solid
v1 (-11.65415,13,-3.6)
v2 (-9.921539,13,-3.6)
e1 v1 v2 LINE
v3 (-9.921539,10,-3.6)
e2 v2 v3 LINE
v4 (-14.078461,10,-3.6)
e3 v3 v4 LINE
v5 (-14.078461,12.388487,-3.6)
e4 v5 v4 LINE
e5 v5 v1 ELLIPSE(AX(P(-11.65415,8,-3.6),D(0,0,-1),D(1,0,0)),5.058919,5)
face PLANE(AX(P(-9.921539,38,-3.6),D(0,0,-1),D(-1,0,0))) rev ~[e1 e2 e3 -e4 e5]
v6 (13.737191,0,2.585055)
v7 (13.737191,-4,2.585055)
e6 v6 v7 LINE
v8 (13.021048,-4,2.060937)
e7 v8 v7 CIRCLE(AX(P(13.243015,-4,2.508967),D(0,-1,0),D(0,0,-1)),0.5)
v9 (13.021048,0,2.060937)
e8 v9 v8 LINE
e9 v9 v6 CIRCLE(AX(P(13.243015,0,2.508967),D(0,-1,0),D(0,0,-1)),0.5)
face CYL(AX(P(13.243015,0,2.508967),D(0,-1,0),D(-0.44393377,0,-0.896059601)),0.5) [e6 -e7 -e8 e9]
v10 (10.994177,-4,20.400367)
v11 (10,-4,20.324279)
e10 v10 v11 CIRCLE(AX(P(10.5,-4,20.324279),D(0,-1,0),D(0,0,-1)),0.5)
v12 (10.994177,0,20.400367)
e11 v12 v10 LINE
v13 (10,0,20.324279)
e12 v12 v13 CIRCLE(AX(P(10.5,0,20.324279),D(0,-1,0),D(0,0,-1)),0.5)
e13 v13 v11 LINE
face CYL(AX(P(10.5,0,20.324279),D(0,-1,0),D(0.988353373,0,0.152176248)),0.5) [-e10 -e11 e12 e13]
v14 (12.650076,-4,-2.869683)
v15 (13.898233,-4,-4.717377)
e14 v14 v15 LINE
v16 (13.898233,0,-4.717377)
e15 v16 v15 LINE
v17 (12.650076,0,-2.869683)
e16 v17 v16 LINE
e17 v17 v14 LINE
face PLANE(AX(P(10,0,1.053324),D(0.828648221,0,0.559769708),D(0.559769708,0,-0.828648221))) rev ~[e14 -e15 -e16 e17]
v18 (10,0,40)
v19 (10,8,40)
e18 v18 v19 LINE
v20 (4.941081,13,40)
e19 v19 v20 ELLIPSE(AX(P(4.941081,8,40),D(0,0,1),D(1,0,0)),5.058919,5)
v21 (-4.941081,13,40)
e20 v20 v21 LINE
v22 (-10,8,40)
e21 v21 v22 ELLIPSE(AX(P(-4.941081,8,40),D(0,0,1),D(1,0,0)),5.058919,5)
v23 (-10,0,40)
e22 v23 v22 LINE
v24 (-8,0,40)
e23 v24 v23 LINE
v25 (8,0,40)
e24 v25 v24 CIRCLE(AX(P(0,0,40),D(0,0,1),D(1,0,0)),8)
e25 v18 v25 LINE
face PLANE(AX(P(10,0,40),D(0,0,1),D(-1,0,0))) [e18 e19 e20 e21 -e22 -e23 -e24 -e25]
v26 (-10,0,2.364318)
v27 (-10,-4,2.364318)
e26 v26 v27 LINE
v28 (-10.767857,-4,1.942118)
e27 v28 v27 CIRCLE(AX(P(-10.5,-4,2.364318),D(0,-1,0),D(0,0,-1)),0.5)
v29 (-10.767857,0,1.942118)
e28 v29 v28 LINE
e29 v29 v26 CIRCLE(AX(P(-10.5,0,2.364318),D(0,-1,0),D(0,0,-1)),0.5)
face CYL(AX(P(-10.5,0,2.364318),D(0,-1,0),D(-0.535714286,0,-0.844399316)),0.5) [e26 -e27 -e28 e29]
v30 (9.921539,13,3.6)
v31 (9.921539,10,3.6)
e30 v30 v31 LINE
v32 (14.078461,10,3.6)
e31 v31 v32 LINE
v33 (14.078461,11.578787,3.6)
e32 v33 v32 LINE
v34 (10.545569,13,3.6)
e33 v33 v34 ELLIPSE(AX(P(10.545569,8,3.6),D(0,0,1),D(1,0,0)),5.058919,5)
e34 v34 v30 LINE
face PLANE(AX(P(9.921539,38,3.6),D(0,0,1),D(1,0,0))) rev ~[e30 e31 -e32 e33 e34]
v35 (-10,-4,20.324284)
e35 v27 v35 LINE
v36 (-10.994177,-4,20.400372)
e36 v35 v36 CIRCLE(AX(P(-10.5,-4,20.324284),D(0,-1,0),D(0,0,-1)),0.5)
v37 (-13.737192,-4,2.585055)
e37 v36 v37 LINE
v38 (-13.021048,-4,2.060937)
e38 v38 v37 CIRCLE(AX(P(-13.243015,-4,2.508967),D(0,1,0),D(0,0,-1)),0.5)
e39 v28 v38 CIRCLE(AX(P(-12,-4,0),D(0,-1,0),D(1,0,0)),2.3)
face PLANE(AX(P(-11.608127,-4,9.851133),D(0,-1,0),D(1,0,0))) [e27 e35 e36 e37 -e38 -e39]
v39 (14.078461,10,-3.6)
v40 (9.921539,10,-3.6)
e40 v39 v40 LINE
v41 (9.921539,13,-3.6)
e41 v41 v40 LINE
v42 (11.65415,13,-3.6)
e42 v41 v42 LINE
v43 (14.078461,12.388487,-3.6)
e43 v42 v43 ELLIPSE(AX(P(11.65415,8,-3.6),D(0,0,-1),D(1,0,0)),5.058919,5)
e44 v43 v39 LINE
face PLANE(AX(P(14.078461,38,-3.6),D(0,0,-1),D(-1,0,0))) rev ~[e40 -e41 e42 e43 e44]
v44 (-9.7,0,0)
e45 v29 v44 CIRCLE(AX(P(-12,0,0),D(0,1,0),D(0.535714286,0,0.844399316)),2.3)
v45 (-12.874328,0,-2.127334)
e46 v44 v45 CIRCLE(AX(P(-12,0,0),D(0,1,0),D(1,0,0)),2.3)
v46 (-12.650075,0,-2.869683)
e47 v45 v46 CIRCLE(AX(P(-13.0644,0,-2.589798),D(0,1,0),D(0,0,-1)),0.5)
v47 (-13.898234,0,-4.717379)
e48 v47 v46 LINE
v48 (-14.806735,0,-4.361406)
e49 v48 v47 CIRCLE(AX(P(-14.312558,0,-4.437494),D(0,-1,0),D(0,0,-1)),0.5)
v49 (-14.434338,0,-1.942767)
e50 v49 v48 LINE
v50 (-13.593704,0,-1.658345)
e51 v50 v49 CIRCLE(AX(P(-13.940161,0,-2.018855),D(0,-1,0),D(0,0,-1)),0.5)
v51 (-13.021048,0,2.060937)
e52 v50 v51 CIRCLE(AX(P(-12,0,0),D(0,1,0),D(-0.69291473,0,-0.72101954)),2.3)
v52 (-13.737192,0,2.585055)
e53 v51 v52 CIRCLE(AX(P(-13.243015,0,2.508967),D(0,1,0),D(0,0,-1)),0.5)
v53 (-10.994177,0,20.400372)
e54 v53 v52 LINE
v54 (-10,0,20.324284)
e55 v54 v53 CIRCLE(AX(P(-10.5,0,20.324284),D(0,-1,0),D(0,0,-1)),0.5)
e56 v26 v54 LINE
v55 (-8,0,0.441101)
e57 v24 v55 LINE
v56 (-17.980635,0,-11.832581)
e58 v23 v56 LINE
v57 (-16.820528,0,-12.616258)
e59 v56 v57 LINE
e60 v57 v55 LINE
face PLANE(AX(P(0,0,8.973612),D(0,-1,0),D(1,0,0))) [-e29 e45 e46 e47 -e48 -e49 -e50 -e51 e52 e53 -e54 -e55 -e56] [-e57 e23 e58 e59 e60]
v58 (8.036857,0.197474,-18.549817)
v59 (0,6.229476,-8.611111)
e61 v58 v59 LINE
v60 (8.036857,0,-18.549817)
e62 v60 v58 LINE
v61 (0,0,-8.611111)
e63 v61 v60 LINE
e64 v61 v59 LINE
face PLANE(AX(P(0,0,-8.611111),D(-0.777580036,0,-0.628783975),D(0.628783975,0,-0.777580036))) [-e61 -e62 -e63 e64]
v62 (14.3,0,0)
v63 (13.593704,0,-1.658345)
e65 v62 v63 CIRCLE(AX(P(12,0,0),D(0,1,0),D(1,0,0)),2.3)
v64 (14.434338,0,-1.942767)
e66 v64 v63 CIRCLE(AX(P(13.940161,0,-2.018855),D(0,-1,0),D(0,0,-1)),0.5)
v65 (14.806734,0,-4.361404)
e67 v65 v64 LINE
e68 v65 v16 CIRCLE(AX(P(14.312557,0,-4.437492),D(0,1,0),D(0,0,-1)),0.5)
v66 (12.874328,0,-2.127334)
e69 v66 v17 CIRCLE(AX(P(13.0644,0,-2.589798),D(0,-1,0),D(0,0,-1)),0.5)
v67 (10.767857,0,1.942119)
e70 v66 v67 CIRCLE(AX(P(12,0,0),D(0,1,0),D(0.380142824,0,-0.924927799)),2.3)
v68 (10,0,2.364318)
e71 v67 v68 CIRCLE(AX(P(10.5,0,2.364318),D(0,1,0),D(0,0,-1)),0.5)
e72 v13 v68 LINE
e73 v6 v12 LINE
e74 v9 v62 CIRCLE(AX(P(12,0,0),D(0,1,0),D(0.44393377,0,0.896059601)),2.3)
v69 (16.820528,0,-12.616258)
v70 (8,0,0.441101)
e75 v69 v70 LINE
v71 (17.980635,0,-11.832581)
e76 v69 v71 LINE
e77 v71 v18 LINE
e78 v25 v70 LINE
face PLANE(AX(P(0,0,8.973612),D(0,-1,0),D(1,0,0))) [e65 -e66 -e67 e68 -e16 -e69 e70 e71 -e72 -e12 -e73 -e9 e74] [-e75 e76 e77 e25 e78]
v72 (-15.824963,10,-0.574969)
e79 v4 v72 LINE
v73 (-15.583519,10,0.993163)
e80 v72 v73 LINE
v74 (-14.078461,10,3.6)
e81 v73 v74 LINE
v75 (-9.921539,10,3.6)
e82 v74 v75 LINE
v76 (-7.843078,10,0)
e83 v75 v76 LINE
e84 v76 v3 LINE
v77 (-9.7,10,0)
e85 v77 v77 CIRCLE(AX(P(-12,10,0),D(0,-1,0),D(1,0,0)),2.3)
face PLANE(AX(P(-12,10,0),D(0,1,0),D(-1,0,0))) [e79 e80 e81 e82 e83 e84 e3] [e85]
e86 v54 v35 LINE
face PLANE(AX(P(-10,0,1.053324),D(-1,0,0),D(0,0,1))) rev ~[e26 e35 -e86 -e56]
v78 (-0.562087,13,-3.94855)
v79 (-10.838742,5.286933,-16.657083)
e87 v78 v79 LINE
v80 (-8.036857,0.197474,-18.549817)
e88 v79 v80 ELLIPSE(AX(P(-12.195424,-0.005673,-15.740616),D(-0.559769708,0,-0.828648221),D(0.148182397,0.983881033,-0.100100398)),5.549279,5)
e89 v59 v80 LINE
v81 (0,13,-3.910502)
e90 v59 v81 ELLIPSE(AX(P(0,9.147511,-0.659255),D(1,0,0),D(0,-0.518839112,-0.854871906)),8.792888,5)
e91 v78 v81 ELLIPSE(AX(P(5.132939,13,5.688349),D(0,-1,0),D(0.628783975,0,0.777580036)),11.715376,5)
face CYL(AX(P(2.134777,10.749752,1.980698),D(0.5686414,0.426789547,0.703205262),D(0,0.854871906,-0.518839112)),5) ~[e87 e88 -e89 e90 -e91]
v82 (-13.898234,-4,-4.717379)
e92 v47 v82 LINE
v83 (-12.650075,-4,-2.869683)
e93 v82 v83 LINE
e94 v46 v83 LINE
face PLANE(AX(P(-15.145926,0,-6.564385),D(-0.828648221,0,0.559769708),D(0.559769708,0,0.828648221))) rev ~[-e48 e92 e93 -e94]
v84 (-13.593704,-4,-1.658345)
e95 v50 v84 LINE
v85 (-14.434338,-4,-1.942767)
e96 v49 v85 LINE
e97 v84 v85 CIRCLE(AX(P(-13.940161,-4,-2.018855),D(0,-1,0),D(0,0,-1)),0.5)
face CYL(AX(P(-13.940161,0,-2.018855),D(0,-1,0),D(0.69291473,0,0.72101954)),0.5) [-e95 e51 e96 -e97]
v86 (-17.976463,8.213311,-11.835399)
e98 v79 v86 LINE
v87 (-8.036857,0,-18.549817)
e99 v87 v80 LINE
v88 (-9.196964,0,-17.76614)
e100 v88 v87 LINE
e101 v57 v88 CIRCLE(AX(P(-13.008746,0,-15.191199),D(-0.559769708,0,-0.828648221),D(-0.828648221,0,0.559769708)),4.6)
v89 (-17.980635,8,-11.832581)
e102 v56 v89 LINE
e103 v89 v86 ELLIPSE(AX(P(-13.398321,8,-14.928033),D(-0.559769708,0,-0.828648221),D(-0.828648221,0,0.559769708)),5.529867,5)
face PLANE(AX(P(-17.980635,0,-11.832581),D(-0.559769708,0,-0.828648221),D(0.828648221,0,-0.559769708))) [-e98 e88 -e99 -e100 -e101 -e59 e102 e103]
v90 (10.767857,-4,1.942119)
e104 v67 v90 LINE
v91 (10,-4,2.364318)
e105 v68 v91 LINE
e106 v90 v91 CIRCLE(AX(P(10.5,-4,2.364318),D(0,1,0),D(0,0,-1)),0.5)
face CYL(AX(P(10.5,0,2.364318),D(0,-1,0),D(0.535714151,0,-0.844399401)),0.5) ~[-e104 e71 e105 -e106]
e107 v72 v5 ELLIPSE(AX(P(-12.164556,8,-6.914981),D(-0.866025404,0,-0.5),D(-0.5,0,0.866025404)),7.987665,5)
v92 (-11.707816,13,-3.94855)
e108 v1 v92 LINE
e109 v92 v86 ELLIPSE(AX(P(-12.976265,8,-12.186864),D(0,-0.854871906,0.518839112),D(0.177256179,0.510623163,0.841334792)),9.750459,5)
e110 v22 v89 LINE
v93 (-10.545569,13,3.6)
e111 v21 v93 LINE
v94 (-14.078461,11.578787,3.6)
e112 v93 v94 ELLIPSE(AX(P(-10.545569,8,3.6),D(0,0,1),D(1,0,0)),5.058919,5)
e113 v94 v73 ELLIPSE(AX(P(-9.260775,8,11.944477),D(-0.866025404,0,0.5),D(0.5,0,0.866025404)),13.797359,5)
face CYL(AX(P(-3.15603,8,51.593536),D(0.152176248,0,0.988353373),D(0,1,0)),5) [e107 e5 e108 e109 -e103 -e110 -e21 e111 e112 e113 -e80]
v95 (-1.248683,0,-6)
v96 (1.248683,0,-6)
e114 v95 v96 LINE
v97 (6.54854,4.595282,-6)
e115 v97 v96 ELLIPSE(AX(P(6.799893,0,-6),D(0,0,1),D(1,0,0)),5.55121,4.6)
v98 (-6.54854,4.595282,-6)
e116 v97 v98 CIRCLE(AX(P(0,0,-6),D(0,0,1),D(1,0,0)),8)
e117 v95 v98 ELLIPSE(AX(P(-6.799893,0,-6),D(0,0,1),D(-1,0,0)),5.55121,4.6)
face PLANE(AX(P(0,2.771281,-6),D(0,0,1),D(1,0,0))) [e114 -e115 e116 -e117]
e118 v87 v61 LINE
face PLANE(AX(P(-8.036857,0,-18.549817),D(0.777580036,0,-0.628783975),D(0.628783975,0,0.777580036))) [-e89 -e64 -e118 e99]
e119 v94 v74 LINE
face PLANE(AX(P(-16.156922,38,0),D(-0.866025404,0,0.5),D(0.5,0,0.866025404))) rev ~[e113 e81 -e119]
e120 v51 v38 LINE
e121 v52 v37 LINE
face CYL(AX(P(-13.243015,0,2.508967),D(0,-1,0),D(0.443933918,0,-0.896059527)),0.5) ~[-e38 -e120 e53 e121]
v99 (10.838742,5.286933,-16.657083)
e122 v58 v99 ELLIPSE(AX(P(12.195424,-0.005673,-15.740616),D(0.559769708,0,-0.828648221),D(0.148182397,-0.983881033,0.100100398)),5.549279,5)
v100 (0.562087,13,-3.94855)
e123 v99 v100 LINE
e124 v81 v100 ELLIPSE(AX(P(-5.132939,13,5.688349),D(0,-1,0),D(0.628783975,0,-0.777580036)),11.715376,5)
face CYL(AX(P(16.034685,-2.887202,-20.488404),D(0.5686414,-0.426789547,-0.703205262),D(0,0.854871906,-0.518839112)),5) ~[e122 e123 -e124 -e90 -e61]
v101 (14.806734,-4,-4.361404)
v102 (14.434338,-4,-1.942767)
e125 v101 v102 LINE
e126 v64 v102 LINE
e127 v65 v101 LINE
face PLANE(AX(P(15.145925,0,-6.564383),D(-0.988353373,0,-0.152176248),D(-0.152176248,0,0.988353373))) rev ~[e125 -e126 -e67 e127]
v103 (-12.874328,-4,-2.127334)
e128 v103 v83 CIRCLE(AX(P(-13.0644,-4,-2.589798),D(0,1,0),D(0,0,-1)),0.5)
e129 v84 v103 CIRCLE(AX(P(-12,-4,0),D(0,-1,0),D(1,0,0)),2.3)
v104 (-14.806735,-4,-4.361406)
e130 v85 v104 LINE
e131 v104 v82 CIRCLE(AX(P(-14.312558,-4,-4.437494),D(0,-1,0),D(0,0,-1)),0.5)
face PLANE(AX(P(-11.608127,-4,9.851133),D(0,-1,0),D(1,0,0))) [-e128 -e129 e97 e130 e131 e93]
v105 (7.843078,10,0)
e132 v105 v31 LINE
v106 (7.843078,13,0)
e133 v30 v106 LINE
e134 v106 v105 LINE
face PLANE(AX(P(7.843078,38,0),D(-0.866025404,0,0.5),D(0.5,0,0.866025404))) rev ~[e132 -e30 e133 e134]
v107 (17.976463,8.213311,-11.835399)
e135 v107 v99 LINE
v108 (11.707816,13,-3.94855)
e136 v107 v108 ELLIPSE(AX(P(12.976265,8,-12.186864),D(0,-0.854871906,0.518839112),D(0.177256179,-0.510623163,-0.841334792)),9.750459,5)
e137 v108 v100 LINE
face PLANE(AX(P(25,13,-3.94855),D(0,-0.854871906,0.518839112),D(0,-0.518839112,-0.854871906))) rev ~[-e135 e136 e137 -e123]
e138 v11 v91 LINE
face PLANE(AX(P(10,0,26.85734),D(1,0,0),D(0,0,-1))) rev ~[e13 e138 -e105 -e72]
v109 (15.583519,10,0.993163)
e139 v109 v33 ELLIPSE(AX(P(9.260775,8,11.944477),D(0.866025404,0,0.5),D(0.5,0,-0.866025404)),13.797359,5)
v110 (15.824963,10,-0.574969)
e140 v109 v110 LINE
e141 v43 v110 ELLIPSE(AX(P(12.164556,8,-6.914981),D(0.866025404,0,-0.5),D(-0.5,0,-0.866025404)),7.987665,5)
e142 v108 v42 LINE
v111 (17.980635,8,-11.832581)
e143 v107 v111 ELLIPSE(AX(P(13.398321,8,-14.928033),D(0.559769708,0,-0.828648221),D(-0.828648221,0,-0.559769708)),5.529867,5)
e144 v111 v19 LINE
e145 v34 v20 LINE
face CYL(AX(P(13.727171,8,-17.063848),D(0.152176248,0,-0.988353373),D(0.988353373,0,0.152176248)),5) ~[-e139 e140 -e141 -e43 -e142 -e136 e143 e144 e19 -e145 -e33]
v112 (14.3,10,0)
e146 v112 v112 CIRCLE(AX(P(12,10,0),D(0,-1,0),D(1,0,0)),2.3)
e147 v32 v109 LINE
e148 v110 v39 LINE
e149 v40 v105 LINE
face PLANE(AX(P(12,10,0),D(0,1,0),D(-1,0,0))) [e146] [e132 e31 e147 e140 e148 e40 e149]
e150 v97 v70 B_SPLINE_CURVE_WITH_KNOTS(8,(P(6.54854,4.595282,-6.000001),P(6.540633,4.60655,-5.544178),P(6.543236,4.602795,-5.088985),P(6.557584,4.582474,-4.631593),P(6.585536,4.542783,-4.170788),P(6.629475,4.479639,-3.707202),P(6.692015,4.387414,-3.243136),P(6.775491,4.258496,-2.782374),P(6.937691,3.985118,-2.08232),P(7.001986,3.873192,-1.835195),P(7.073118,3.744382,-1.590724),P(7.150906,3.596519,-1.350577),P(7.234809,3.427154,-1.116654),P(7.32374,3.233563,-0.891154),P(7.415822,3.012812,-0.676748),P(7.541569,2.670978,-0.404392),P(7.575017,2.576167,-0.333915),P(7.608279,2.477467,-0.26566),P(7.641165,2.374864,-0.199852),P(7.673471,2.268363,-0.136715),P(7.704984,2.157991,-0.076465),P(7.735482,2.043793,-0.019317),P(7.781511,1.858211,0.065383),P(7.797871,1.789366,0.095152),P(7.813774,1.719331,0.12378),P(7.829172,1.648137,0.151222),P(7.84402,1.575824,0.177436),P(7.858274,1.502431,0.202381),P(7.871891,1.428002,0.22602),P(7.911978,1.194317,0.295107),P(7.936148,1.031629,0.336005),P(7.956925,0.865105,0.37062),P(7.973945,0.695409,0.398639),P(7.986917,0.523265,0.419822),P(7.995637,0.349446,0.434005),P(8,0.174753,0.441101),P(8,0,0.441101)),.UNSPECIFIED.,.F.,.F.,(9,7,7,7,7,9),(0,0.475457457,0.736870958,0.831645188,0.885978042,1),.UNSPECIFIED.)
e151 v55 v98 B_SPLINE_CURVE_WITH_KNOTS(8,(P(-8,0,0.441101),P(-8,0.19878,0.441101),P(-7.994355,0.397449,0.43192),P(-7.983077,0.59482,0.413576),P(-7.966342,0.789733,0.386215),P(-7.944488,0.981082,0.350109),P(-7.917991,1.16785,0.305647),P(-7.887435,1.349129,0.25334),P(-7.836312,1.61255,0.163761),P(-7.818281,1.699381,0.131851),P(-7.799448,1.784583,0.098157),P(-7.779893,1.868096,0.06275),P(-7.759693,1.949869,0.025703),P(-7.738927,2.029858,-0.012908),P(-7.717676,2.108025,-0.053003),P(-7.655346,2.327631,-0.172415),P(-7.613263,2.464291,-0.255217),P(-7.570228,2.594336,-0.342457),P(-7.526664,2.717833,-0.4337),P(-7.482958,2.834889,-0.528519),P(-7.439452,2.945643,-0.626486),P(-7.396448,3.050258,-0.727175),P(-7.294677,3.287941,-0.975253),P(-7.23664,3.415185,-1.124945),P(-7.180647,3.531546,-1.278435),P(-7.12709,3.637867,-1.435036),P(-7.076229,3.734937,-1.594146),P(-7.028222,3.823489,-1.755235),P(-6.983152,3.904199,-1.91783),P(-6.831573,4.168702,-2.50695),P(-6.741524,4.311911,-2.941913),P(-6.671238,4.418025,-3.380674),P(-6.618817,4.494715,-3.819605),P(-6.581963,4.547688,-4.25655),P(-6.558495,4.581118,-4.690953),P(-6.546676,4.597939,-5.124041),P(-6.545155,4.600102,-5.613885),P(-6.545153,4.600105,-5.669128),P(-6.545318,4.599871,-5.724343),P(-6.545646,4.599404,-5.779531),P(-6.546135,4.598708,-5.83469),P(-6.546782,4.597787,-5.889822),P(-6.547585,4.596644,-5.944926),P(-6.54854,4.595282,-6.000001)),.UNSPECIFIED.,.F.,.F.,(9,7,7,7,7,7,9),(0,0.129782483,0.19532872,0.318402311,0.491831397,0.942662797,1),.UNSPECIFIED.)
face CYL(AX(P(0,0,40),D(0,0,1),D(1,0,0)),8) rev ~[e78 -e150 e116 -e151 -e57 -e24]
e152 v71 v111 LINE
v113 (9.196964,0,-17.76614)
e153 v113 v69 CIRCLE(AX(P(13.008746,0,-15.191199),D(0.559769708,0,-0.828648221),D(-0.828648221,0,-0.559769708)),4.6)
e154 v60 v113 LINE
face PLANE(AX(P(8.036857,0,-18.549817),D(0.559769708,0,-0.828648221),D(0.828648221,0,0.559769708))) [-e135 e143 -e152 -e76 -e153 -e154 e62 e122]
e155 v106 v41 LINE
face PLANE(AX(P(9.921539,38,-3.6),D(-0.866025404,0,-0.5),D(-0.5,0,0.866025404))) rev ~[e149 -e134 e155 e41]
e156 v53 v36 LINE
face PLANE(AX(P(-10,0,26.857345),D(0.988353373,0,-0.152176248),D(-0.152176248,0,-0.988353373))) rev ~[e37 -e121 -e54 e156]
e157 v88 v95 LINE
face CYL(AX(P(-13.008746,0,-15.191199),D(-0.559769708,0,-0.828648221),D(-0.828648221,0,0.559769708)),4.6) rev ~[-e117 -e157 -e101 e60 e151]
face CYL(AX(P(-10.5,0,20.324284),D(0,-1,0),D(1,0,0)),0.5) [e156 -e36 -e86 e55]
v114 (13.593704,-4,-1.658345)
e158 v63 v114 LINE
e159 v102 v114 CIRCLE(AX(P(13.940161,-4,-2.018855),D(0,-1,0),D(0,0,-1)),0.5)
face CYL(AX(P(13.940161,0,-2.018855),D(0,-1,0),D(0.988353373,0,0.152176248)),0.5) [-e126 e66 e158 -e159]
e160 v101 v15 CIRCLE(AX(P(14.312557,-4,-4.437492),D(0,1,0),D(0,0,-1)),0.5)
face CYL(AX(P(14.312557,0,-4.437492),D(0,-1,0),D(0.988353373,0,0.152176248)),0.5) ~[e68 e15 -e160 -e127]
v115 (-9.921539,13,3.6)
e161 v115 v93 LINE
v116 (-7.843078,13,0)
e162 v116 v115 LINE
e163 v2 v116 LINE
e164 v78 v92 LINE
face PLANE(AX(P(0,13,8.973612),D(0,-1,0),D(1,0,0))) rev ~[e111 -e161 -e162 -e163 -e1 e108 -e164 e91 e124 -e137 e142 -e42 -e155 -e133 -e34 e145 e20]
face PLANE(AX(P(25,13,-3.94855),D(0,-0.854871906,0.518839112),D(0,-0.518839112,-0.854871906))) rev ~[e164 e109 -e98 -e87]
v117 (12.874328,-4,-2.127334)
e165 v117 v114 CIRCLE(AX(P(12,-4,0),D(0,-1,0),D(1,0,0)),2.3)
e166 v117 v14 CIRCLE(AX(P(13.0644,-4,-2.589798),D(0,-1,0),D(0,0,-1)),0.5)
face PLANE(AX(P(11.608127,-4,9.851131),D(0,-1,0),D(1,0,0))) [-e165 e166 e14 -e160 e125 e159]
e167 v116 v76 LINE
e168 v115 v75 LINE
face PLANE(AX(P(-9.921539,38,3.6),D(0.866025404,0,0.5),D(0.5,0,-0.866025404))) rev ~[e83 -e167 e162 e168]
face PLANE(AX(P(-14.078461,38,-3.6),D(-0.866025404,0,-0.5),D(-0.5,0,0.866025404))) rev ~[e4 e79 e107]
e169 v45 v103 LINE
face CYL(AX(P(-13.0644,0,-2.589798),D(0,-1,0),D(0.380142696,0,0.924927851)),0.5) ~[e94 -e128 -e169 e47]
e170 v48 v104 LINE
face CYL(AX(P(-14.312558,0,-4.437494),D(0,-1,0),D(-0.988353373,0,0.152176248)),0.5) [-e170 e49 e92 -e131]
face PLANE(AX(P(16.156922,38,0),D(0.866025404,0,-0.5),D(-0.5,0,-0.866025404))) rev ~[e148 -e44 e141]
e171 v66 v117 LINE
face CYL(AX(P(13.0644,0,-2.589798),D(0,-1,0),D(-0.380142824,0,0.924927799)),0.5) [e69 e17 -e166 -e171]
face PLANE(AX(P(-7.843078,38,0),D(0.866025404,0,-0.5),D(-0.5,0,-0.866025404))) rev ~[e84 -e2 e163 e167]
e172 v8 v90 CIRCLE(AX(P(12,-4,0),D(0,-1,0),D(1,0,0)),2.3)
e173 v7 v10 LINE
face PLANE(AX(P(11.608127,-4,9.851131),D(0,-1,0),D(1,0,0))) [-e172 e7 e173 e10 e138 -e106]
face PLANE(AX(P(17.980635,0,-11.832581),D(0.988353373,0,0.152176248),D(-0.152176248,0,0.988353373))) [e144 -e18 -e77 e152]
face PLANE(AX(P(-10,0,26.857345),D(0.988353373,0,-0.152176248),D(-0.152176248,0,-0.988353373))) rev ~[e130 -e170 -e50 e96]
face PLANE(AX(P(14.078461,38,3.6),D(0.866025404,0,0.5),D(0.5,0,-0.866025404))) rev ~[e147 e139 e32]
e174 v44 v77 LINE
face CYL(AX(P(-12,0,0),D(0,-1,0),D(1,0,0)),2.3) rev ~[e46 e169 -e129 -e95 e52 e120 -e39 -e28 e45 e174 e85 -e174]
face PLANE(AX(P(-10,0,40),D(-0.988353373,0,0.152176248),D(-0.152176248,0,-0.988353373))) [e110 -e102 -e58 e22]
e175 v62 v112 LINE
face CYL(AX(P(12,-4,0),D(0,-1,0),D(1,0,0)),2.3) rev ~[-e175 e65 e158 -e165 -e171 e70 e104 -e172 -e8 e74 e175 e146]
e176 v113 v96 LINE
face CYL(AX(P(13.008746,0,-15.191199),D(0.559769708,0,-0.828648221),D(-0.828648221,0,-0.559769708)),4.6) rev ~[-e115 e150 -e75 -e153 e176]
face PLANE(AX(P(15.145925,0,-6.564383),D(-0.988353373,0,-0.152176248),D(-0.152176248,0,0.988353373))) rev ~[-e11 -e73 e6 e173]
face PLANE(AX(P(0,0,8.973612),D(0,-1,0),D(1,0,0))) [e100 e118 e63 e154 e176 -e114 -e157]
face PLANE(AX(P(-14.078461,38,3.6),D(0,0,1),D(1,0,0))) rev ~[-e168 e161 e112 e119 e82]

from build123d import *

# Parameters (mm, degrees)
F0_R          = 2.3
F1_DEPTH      = 13
F3_DEPTH      = 46
F6_DEPTH      = 52.2
F8_DEPTH      = 25
F10_DEPTH     = 25
F11_T1_DEPTH  = 69.4664340584
F11_T3_DEPTH  = 69.4664340584
F11_T8_DEPTH  = 31.9524083705
F11_T13_DEPTH = 31.9524083705
F11_T19_DEPTH = 31.9524083705
F11_T23_DEPTH = 31.9524083705
F15_DEPTH     = 4
F16_DEPTH     = 4
F19_DEPTH     = 28
F20_R         = 2.3
F21_DEPTH     = 25
F22_R         = 2.3
F23_DEPTH     = 25
F24_R         = 0.5


# Not quite as in the source:
# - a fillet or chamfer that OpenCascade refuses, or shapes differently, is made with other operations: its cross-section is extruded or revolved along the edge and cut away or added
# - a feature names something its author has since deleted; it is built from what else it names


with BuildPart() as f1:
    # F0 (on Front) → F1 (new body)
    with BuildSketch(Plane.XZ):
        Polygon((10, 40), (-10, 40), (-17.9806351662, -11.8325809017), (-8.0368565166, -18.5498173996), (0, -8.6111112242), (8.0368565166, -18.5498173996), (17.9806351662, -11.8325809017), align=None)
        with Locations((-12, 0)):
            Circle(F0_R, mode=Mode.SUBTRACT)
        with Locations((12, 0)):
            Circle(F0_R, mode=Mode.SUBTRACT)
    extrude(amount=-F1_DEPTH)

    # F2 (on face) → F3 (cut)
    with BuildSketch(Plane.XY.offset(40)):
        with BuildLine():
            Line((-8, 0), (8, 0))
            ThreePointArc((8, 0), (0, 8), (-8, 0))
        make_face()
    extrude(amount=-F3_DEPTH, mode=Mode.SUBTRACT)

    # F5 (on offset) → F6 (cut)
    with BuildSketch(Plane.YZ.offset(25)):
        Polygon((13, -3.9485500787), (4.1381944902, -18.5498173996), (13, -18.5498173996), align=None)
    extrude(amount=-F6_DEPTH, mode=Mode.SUBTRACT)

    # F7 (on face) → F8 (cut)
    with BuildSketch(Plane(origin=(-11.122658813, 0, -16.4652915326), x_dir=(0.8286482208, 0, -0.5597697082), z_dir=(-0.5597697082, 0, -0.8286482208))):
        with BuildLine():
            ThreePointArc((-6.8761009811, 0), (-2.2761009811, -4.6), (2.3238990189, 0))
            Line((2.3238990189, 0), (-6.8761009811, 0))
        make_face()
    extrude(amount=-F8_DEPTH, mode=Mode.SUBTRACT)

    # F9 (on face) → F10 (cut)
    with BuildSketch(Plane(origin=(11.122658813, 0, -16.4652915326), x_dir=(0.8286482208, 0, 0.5597697082), z_dir=(0.5597697082, 0, -0.8286482208))):
        with BuildLine():
            ThreePointArc((-2.3238990189, 0), (2.2761009811, -4.6), (6.8761009811, 0))
            Line((6.8761009811, 0), (-2.3238990189, 0))
        make_face()
    extrude(amount=-F10_DEPTH, mode=Mode.SUBTRACT)

    # F11: fillet of radius 5 on 4 edges, made by hand

    # F11_s2 → F11_t1 (cut)
    with BuildSketch(Plane(origin=(7.6867833124, 0, 49.9240736631), x_dir=(0, 1, 0), z_dir=(-0.152176248, 0, -0.9883533728))):
        with BuildLine():
            ThreePointArc((13, -10.9705836466), (11.5355339059, -14.5061175525), (8, -15.9705836466))
            Line((8, -15.9705836466), (13, -15.9705836466))
            Line((13, -15.9705836466), (13, -10.9705836466))
        make_face()
    extrude(amount=F11_T1_DEPTH, mode=Mode.SUBTRACT)

    # F11_s4 → F11_t3 (cut)
    with BuildSketch(Plane(origin=(2.8843579817, 0, -18.733310736), x_dir=(0, 1, 0), z_dir=(-0.152176248, 0, 0.9883533728))):
        with BuildLine():
            ThreePointArc((8, -15.9705836466), (11.5355339059, -14.5061175525), (13, -10.9705836466))
            Line((13, -10.9705836466), (13, -15.9705836466))
            Line((13, -15.9705836466), (8, -15.9705836466))
        make_face()
    extrude(amount=F11_T3_DEPTH, mode=Mode.SUBTRACT)


with BuildPart() as f11_tool6:
    # F11_s7 → F11_t8 (new body)
    with BuildSketch(Plane(origin=(4.0911710208, 3.0705977915, 5.0593097692), x_dir=(0.6002776597, -0.7997916799, 0), z_dir=(-0.5686414, -0.4267895471, -0.7032052622))):
        with BuildLine():
            ThreePointArc((-10.7347001393, -7.9787789452), (-7.9821654916, -9.2854915519), (-4.9822833283, -8.7519638303))
            Line((-4.9822833283, -8.7519638303), (-8.1340389445, -10.4154145762))
            Line((-8.1340389445, -10.4154145762), (-10.7347001393, -7.9787789452))
        make_face()
    extrude(amount=F11_T8_DEPTH)

    split(bisect_by=Plane(origin=(-4.2102294585, 0, -3.404568911), x_dir=(0, 1, 0), z_dir=(-0.7775800359, 0, -0.6287839754)), keep=Keep.TOP)


with BuildPart() as f1_1:
    add(f1.part)

    # F11_t5: cut F11_tool6
    add(f11_tool6.part, mode=Mode.SUBTRACT)


with BuildPart() as f11_tool11:
    # F11_s12 → F11_t13 (new body)
    with BuildSketch(Plane(origin=(14.0782912081, -10.566356105, -17.4097919354), x_dir=(-0.6002776597, -0.7997916799, 0), z_dir=(-0.5686414, 0.4267895471, 0.7032052622))):
        with BuildLine():
            ThreePointArc((-10.7347001393, -7.9787789452), (-7.9821654916, -9.2854915519), (-4.9822833283, -8.7519638303))
            Line((-4.9822833283, -8.7519638303), (-8.1340389445, -10.4154145762))
            Line((-8.1340389445, -10.4154145762), (-10.7347001393, -7.9787789452))
        make_face()
    extrude(amount=F11_T13_DEPTH)

    split(bisect_by=Plane(origin=(4.2102294585, 0, -3.404568911), x_dir=(0, 1, 0), z_dir=(0.7775800359, 0, -0.6287839754)), keep=Keep.TOP)


with BuildPart() as f1_2:
    add(f1_1.part)

    # F11_t10: cut F11_tool11
    add(f11_tool11.part, mode=Mode.SUBTRACT)


with BuildPart() as f11_tool17:
    # F11_s18 → F11_t19 (new body)
    with BuildSketch(Plane(origin=(14.0782912081, -10.566356105, -17.4097919354), x_dir=(-0.6002776597, -0.7997916799, 0), z_dir=(-0.5686414, 0.4267895471, 0.7032052622))):
        with BuildLine():
            ThreePointArc((-10.7347001393, -7.9787789452), (-7.9821654916, -9.2854915519), (-4.9822833283, -8.7519638303))
            Line((-4.9822833283, -8.7519638303), (-8.1340389445, -10.4154145762))
            Line((-8.1340389445, -10.4154145762), (-10.7347001393, -7.9787789452))
        make_face()
    extrude(amount=F11_T19_DEPTH)

    split(bisect_by=Plane(origin=(4.2102294585, 0, -3.404568911), x_dir=(0, 1, 0), z_dir=(-0.7775800359, 0, 0.6287839754)), keep=Keep.TOP)


with BuildPart() as f11_tool21:
    # F11_s22 → F11_t23 (new body)
    with BuildSketch(Plane(origin=(4.0911710208, 3.0705977915, 5.0593097692), x_dir=(0.6002776597, -0.7997916799, 0), z_dir=(-0.5686414, -0.4267895471, -0.7032052622))):
        with BuildLine():
            ThreePointArc((-10.7347001393, -7.9787789452), (-7.9821654916, -9.2854915519), (-4.9822833283, -8.7519638303))
            Line((-4.9822833283, -8.7519638303), (-8.1340389445, -10.4154145762))
            Line((-8.1340389445, -10.4154145762), (-10.7347001393, -7.9787789452))
        make_face()
    extrude(amount=F11_T23_DEPTH)

    split(bisect_by=Plane(origin=(-4.2102294585, 0, -3.404568911), x_dir=(0, 1, 0), z_dir=(0.7775800359, 0, 0.6287839754)), keep=Keep.TOP)


with BuildPart() as f11_tool17_1:
    add(f11_tool17.part)

    # F11_t25: intersect F11_tool21
    add(f11_tool21.part, mode=Mode.INTERSECT)


with BuildPart() as f1_3:
    add(f1_2.part)

    # F11_t15: cut F11_tool17
    add(f11_tool17_1.part, mode=Mode.SUBTRACT)

    # F14 (on face) → F15 (join)
    with BuildSketch(Plane.XZ):
        Polygon((-15.1459260242, -6.5643846345), (-10, 1.0533238305), (-10, 26.8573445146), align=None)
    extrude(amount=F15_DEPTH)

    # F12 (on face) → F16 (join)
    with BuildSketch(Plane.XZ):
        Polygon((15.1459253956, -6.5643830302), (10.0000003771, 26.8573395869), (10.0000003771, 1.0533239459), align=None)
    extrude(amount=F16_DEPTH)

    # F18 (on offset) → F19 (cut)
    with BuildSketch(Plane(origin=(0, 38, 0), x_dir=(-1, 0, 0), z_dir=(0, 1, 0))):
        Polygon((-9.9215390309, 3.6), (-14.0784609691, 3.6), (-16.1569219382, 0), (-14.0784609691, -3.6), (-9.9215390309, -3.6), (-7.8430780618, 0), align=None)
        Polygon((14.0784609691, 3.6), (9.9215390309, 3.6), (7.8430780618, 0), (9.9215390309, -3.6), (14.0784609691, -3.6), (16.1569219382, 0), align=None)
    extrude(amount=-F19_DEPTH, mode=Mode.SUBTRACT)

    # F20 (on face) → F21 (cut)
    with BuildSketch(Plane.XZ.offset(4)):
        with Locations((12, 0)):
            Circle(F20_R)
    extrude(amount=-F21_DEPTH, mode=Mode.SUBTRACT)

    # F22 (on face) → F23 (cut)
    with BuildSketch(Plane.XZ.offset(4)):
        with Locations((-12, 0)):
            Circle(F22_R)
    extrude(amount=-F23_DEPTH, mode=Mode.SUBTRACT)

    # F24
    f24_edges = [f1_3.edges().sort_by_distance(p)[0] for p in [
        (-10, -2, 26.857345),
        (10, -2, 26.85734),
        (-15.145926, -2, -6.564385),
        (15.145925, -2, -6.564383),
        (-10, -2, 1.135782),
        (-13.946588, -2, 1.22507),
        (-14.224942, -2, -0.582781),
        (10, -2, 1.135782),
        (13.946587, -2, 1.22507),
        (14.224941, -2, -0.582782),
        (12.255618, -2, -2.285751),
        (-12.255617, -2, -2.285751),
    ]]
    fillet(f24_edges, radius=F24_R)


solid = f1_3.part
